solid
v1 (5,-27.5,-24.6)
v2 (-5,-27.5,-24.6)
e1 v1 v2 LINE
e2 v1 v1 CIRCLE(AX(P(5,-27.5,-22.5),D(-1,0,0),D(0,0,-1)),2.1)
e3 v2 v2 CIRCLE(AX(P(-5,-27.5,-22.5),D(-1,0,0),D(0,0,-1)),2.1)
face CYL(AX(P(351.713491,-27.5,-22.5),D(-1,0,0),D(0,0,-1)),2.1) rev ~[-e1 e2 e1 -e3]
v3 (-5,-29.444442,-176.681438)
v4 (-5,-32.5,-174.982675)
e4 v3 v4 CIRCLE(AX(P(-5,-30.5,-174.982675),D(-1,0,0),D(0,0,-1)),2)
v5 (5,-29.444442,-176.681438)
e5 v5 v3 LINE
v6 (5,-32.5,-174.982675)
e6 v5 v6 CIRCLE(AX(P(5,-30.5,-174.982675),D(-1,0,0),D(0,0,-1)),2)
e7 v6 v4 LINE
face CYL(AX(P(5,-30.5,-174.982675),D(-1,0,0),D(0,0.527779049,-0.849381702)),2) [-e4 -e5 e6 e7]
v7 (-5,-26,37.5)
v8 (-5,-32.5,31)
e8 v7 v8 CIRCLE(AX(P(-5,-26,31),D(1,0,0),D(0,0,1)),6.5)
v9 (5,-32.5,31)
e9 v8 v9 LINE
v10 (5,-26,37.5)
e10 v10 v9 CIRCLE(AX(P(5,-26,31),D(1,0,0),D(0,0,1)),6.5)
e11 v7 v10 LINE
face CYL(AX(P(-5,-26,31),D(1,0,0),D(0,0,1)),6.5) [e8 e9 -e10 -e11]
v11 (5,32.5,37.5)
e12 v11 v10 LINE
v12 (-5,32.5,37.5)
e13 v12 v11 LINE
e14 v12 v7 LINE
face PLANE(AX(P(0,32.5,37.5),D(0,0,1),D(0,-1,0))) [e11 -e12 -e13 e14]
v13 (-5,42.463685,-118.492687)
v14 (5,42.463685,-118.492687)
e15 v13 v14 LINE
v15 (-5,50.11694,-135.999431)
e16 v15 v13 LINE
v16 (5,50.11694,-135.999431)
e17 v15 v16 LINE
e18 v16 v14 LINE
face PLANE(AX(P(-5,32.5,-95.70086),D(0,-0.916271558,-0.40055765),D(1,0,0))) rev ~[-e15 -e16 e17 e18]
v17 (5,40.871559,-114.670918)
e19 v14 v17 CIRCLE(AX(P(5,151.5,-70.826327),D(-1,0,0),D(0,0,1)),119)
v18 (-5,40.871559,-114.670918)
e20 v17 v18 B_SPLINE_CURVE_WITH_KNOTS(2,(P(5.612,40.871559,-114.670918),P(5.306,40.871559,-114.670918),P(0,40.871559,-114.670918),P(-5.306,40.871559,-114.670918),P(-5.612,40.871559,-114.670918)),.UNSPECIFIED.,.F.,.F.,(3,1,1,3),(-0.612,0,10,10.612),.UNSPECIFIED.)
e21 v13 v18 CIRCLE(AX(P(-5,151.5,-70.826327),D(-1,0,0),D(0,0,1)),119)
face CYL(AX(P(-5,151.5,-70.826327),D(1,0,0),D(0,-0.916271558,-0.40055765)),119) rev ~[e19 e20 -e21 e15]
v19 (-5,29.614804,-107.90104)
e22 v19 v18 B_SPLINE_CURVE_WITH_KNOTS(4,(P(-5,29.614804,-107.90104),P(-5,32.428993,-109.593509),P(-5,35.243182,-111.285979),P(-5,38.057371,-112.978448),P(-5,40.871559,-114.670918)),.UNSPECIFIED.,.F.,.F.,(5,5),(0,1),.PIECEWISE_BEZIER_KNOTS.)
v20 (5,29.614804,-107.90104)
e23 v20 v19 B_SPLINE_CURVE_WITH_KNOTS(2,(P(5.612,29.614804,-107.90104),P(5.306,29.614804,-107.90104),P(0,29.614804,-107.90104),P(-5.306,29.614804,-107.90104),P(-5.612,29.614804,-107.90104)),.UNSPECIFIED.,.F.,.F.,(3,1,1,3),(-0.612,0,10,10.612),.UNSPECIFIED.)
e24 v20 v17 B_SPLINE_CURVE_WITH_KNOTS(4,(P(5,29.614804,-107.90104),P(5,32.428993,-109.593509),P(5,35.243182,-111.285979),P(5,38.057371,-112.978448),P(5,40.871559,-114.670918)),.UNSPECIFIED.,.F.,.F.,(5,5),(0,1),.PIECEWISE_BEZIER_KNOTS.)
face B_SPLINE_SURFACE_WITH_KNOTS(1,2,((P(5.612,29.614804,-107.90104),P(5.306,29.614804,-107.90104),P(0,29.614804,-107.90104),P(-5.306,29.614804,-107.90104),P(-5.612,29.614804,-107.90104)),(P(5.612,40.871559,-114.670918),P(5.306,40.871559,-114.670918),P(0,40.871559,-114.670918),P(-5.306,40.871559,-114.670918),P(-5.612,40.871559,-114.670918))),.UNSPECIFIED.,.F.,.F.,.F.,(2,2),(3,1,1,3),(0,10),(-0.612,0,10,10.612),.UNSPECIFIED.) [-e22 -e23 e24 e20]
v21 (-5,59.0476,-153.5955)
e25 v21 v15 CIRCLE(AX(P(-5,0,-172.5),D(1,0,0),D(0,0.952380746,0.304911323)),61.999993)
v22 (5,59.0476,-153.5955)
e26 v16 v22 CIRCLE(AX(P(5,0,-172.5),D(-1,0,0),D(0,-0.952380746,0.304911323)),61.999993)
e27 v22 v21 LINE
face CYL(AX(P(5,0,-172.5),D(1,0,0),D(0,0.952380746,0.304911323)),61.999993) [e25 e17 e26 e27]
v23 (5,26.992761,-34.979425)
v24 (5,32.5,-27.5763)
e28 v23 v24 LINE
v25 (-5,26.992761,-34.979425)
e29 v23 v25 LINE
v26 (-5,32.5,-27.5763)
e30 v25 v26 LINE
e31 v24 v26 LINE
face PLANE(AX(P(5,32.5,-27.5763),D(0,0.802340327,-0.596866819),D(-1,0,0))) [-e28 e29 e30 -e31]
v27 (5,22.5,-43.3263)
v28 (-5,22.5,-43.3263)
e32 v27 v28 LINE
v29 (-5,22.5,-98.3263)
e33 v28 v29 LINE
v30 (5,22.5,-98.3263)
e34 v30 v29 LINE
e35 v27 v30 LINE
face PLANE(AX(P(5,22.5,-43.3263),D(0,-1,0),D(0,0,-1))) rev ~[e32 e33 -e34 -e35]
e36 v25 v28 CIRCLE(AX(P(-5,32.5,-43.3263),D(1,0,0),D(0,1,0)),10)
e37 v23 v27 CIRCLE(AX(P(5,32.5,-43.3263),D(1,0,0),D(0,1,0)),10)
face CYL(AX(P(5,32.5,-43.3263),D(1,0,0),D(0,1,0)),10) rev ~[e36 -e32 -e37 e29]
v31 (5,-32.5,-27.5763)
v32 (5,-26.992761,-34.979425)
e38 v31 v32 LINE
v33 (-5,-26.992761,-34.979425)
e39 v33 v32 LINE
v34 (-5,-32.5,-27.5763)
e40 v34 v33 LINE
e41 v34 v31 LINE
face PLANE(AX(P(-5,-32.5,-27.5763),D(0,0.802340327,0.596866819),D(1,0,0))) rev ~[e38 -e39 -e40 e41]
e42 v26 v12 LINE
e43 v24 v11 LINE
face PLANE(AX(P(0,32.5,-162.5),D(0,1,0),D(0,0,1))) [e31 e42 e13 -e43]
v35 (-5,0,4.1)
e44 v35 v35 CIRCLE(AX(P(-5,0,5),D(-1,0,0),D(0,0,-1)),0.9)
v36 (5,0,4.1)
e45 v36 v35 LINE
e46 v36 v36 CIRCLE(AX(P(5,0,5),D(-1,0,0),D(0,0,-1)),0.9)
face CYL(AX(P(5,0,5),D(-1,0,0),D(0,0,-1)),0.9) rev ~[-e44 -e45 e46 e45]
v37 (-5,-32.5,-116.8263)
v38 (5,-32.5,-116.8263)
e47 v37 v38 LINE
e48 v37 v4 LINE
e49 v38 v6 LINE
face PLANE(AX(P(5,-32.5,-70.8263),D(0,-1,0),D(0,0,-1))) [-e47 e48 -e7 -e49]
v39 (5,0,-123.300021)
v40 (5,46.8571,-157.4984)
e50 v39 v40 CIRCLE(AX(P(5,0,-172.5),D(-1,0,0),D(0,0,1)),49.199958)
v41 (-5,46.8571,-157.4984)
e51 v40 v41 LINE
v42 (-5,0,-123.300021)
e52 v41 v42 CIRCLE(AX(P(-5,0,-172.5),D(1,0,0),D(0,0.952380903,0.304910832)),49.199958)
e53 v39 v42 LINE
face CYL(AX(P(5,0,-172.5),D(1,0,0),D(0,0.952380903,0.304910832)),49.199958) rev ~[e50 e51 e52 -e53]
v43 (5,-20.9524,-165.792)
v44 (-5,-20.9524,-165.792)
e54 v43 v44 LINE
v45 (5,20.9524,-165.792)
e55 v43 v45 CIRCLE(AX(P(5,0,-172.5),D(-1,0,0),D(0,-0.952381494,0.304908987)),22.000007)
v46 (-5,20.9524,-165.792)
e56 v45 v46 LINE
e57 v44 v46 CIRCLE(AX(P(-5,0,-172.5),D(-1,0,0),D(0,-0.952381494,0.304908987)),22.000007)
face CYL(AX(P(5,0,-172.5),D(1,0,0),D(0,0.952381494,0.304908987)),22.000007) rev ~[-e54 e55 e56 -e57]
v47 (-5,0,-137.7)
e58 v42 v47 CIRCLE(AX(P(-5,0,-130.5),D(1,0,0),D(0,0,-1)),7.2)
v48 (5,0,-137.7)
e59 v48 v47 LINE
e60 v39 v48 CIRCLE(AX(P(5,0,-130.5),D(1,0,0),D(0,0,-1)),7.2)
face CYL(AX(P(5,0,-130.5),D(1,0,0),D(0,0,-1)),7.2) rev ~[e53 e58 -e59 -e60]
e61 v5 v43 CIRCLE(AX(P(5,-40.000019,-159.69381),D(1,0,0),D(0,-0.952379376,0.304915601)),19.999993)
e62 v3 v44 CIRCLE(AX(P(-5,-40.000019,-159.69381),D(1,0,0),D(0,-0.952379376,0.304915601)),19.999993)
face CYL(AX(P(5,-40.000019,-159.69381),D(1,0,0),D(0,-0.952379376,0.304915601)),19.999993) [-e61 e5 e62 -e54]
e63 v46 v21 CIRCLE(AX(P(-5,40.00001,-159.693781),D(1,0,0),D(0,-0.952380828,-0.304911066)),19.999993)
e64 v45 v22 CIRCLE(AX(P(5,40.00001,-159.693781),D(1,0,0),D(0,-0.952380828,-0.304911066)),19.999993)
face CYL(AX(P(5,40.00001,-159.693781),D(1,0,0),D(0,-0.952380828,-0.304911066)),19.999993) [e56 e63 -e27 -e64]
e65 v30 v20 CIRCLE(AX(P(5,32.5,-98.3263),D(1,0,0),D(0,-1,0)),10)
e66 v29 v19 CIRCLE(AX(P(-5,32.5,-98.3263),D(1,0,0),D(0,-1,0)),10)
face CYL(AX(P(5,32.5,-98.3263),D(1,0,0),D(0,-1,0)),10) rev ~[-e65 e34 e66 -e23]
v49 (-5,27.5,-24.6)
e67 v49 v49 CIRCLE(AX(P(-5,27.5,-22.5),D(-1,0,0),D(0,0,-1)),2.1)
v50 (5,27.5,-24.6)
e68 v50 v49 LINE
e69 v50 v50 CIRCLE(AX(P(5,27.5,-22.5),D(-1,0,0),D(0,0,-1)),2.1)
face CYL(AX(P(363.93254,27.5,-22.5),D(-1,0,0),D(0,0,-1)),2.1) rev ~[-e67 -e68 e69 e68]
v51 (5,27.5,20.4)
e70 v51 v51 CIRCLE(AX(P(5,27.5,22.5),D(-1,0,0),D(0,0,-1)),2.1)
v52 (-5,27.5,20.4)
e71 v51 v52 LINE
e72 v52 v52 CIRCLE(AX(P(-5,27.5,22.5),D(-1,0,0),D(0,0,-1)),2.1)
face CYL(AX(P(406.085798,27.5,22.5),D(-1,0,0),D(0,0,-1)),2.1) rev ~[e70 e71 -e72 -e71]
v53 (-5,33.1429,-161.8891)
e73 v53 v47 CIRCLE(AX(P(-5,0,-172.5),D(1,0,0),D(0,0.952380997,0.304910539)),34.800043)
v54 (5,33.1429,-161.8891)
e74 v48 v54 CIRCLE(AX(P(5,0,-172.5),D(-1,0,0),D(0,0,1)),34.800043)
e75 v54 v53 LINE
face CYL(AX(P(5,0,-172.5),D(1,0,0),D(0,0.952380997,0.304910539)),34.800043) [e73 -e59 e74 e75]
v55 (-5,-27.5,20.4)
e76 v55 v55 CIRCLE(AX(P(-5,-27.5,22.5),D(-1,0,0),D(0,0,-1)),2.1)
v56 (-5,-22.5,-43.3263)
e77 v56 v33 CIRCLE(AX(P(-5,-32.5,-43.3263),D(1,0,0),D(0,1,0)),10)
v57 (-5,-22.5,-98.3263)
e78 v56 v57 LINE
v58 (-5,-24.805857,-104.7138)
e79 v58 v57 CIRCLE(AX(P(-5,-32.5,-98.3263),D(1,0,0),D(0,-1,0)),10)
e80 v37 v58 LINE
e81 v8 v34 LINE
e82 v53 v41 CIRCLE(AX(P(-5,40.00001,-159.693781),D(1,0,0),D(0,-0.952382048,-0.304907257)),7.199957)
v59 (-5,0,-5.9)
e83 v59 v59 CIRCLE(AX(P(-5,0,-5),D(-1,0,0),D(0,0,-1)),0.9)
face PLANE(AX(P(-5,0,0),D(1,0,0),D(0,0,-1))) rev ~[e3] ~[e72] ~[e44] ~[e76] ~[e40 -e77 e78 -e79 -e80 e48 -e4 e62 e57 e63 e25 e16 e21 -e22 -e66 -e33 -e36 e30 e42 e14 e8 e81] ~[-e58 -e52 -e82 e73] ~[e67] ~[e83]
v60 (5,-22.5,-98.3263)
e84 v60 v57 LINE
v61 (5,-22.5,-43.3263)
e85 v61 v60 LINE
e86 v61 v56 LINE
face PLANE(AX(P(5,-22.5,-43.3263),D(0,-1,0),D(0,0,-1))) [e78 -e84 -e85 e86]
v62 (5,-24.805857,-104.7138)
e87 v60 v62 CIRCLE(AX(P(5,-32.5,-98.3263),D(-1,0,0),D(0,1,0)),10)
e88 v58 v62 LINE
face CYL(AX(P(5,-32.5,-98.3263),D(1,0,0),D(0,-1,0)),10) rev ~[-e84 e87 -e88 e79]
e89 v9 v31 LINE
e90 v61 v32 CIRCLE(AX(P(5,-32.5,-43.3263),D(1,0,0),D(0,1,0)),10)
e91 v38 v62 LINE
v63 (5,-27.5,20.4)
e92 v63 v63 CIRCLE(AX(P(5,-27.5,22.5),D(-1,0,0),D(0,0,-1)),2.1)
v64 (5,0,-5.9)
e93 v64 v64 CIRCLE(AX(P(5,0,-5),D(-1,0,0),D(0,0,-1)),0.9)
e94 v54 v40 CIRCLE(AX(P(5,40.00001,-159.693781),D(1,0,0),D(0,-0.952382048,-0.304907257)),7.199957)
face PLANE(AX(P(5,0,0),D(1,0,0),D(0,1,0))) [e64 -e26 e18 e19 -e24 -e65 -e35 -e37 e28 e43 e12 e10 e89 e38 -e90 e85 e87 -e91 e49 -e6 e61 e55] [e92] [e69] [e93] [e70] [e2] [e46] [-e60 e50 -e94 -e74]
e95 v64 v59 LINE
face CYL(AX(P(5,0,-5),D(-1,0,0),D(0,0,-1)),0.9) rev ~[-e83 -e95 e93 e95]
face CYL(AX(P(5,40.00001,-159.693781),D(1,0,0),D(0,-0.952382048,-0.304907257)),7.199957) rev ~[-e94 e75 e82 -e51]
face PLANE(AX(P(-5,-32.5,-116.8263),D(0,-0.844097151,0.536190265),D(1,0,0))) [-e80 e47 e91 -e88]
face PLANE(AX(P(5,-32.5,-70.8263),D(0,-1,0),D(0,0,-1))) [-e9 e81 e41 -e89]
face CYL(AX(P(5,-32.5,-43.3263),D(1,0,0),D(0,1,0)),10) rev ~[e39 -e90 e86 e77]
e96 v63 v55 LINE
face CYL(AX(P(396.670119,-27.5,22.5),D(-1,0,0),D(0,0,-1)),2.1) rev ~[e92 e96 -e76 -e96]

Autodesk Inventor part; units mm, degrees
ref_plane "YZ Plane" through (0, 0, 0) normal (1, 0, 0) x (0, 1, 0)
ref_plane "XZ Plane" through (0, 0, 0) normal (0, 1, 0) x (-1, 0, 0)
ref_plane "XY Plane" through (0, 0, 0) normal (0, 0, 1) x (1, 0, 0)
sketch "Sketch1" plane through (0, 0, 0) normal (1, 0, 0) x (0, 1, 0)
  line L0 (-27.5, 22.5) -> (27.5, 22.5)
  line L1 (27.5, 22.5) -> (27.5, -22.5)
  line L2 (27.5, -22.5) -> (-27.5, -22.5)
  line L3 (-27.5, -22.5) -> (-27.5, 22.5)
  line L4 (-27.5, 22.5) -> (27.5, -22.5) construction
  line L5 (27.5, 22.5) -> (-27.5, -22.5) construction
  line L6 (32.5, 37.5) -> (-32.5, 37.5)
  line L7 (-32.5, 37.5) -> (-32.5, -162.5)
  line L8 (-32.5, -162.5) -> (32.5, -162.5)
  line L9 (32.5, -162.5) -> (32.5, 37.5)
  line L10 (0, 0) -> (0, -107.0279) construction
  dimension "d0" = 45
  dimension "d1" = 55
  dimension "d2" = 65
  dimension "d3" = 200
  dimension "d4" = 15
extrude "Extrusion1" add sketch "Sketch1" along normal mid plane 10 contours L0 L1 L2 L3 | L9 L8 L7 L6
hole "Hole1" at (0, 27.5, 22.5) at (0, -27.5, 22.5) at (0, -27.5, -22.5) at (0, 27.5, -22.5) direction (-1, 0, 0) diameter 4.2 end through all both
sketch "Sketch3" plane through (5, 0, 0) normal (1, 0, 0) x (0, 0, -1)
  circle A0 centre (22.5, -27.5) radius 2.1 projected
  circle A1 centre (-22.5, 27.5) radius 2.1 projected
  circle A2 centre (-22.5, -27.5) radius 2.1 projected
  circle A3 centre (22.5, 27.5) radius 2.1 projected
  line L0 (-37.5, -32.5) -> (162.5, -32.5) projected
  line L1 (162.5, -32.5) -> (162.5, 32.5) projected
  line L2 (162.5, 32.5) -> (-37.5, 32.5) projected
  line L3 (-37.5, 32.5) -> (-37.5, -32.5) projected
  line L4 (162.5, 0) -> (-37.5, 0) construction
  line L5 (-37.5, 32.5) -> (-37.5, -32.5) projected
  line L6 (162.5, -32.5) -> (162.5, 32.5) projected
  arc A4 (159.6938, 40) -> (159.6938, -40) centre (172.5, 0) ccw construction
  arc A5 (153.5955, 59.0476) -> (153.5955, -59.0476) centre (172.5, 0) ccw
  arc A6 (165.792, 20.9524) -> (165.792, -20.9524) centre (172.5, 0) ccw
  arc A7 (165.792, 20.9524) -> (153.5955, 59.0476) centre (159.6938, 40) ccw
  arc A8 (153.5955, -59.0476) -> (165.792, -20.9524) centre (159.6938, -40) ccw
  arc A9 (157.4984, 46.8571) -> (157.4984, -46.8571) centre (172.5, 0) ccw
  arc A10 (157.4984, -46.8571) -> (161.8891, -33.1429) centre (159.6938, -40) ccw
  arc A11 (161.8891, 33.1429) -> (161.8891, -33.1429) centre (172.5, 0) ccw
  arc A12 (161.8891, 33.1429) -> (157.4984, 46.8571) centre (159.6938, 40) ccw
  circle A13 centre (130.5, 0) radius 7.2
  point P0 (0, 0)
  point P1 (162.5, 0)
  point P2 (135.5623, -32.5)
  point P3 (119.7009, -32.5)
  point P4 (113.3868, -25)
  point P5 (160.0585, -32.5)
  point P6 (160.0585, 32.5)
  point P7 (113.3868, 25)
  point P8 (119.7009, 32.5)
  point P9 (135.5623, 32.5)
  point P10 (116.802, 25)
  point P11 (116.802, -25)
  point P12 (123.3, 0)
  point P13 (137.7, 0)
  point P14 (162.5, -19.5959)
  point P15 (162.5, 19.5959)
  dimension "d27" = 42
  dimension "d28" = 20
  dimension "d29" = 10
  dimension "d30" = 80
  dimension "d32" = 7.2
extrude "Extrusion2" add sketch "Sketch3" against normal blind 10 contours A5 L2 A9 L0 | L0 A9 A10 A11 L1 A6 A8 A5 | A9 A13 A11 L0 | L0 A11 A10 A9 | A5 A7 A6 L1 L2 A11 A12 A9 | A11 L2 L1 A6 L0 | A9 L2 A11 A13 | A13 | A9 A12 A11 L2
extrude "Extrusion3" cut sketch "Sketch3" against normal blind 85 contours A9 L2 A11 A13 | A13 | A9 A12 A11 L2
extrude "Extrusion4" cut sketch "Sketch3" against normal blind 85 contours A6 L1
chamfer "Chamfer1" distance 24 angle 45 2 edges at (0, 32.5, -119.7009) (0, -32.5, -119.7009)
fillet "Fillet1" radius 119 2 edges at (0, 32.5, -95.7009) (0, -32.5, -95.7009)
sketch "Sketch4" plane through (5, 0, 0) normal (1, 0, 0) x (0, 0, -1)
  arc A0 (118.4927, -42.4637) -> (70.8263, -32.5) centre (70.8263, -151.5) ccw projected
  line L0 (70.8263, -32.5) -> (178.2342, -32.5)
  arc A1 (153.5955, -59.0476) -> (165.792, -20.9524) centre (159.6938, -40) ccw projected
  arc A2 (135.9994, -50.1169) -> (153.5955, -59.0476) centre (172.5, 0) ccw projected
  line L1 (135.9994, -50.1169) -> (118.4927, -42.4637) projected
  point P0 (0, 0)
extrude "Extrusion5" cut sketch "Sketch4" against normal blind 36.25
fillet "Fillet2" radius 2 1 edges at (0, -32.5, -178.2342)
sketch "Sketch5" plane through (5, 0, 0) normal (1, 0, 0) x (0, 0, -1)
  line L0 (0, 0) -> (0, 9.6714)
  line L1 (-5, 0) -> (5, 0)
  dimension "d46" = 10
hole "Hole3" at (5, 0, -5) at (5, 0, 5) direction (-1, 0, 0) diameter 1.8 end through all
sketch "Sketch6" plane through (5, 0, 0) normal (1, 0, 0) x (0, 0, -1)
  circle A0 centre (5, 0) radius 0.9 projected
  circle A1 centre (-5, 0) radius 0.9 projected
  arc A2 (174.9826, -32.5) -> (176.6814, -29.4444) centre (174.9826, -30.5) ccw projected
  arc A3 (176.6814, -29.4444) -> (165.792, -20.9524) centre (159.6938, -40) ccw projected
  arc A4 (165.792, 20.9524) -> (165.792, -20.9524) centre (172.5, 0) ccw projected
  arc A5 (165.792, 20.9524) -> (153.5955, 59.0476) centre (159.6938, 40) ccw projected
  arc A6 (153.5955, 59.0476) -> (135.9994, 50.1169) centre (172.5, 0) ccw projected
  line L0 (118.4927, 42.4637) -> (135.9994, 50.1169) projected
  arc A7 (70.8263, 32.5) -> (118.4927, 42.4637) centre (70.8263, 151.5) ccw projected
  line L1 (70.8263, 32.5) -> (-37.5, 32.5) projected
  line L2 (-37.5, 32.5) -> (-37.5, -32.5) projected
  line L3 (-37.5, -32.5) -> (174.9826, -32.5) projected
  circle A8 centre (22.5, 27.5) radius 2.1 projected
  circle A9 centre (-22.5, -27.5) radius 2.1 projected
  circle A10 centre (-22.5, 27.5) radius 2.1 projected
  circle A11 centre (22.5, -27.5) radius 2.1 projected
  arc A12 (123.3, 0) -> (137.7, 0) centre (130.5, 0) ccw projected
  arc A13 (157.4984, 46.8571) -> (123.3, 0) centre (172.5, 0) ccw projected
  arc A14 (161.8891, 33.1429) -> (157.4984, 46.8571) centre (159.6938, 40) ccw projected
  arc A15 (161.8891, 33.1429) -> (137.7, 0) centre (172.5, 0) ccw projected
  line L4 (-37.5, 32.5) -> (70.8263, 32.5) projected
  line L5 (70.8263, 32.5) -> (70.8263, -32.5) construction
  line L6 (174.9826, -32.5) -> (-37.5, -32.5) projected
  line L7 (43.3263, 32.5) -> (98.3263, 32.5) construction
  line L8 (70.8263, 32.5) -> (-37.5, 32.5) projected
  line L9 (43.3263, 22.5) -> (98.3263, 22.5)
  line L10 (98.3263, 42.5) -> (43.3263, 42.5)
  arc A16 (43.3263, 42.5) -> (43.3263, 22.5) centre (43.3263, 32.5) ccw
  arc A17 (98.3263, 22.5) -> (98.3263, 42.5) centre (98.3263, 32.5) ccw
  line L11 (70.8263, 0) -> (130.5, 0) construction
  line L12 (43.3263, -22.5) -> (98.3263, -22.5)
  line L13 (98.3263, -42.5) -> (43.3263, -42.5)
  arc A18 (43.3263, -22.5) -> (43.3263, -42.5) centre (43.3263, -32.5) ccw
  arc A19 (98.3263, -42.5) -> (98.3263, -22.5) centre (98.3263, -32.5) ccw
  point P0 (0, 0)
  point P1 (106.6621, 38.024)
  point P2 (33.3263, 32.5)
  dimension "d57" = 10
  dimension "d58" = 55
extrude "Extrusion6" cut sketch "Sketch6" against normal blind 27.5 contours A19 L13 A18 L3 | L3 A18 L12 A19 | L1 A7 A17 L9 A16
chamfer "Chamfer2" distance 8.5 angle 45 2 edges at (0, -32.5, -108.3263) (0, 38.024, -106.6621)
chamfer "Chamfer3" distance 5.75 angle 45 2 edges at (0, -32.5, -33.3263) (0, 32.5, -33.3263)
fillet "Fillet3" radius 6.5 1 edges at (0, -32.5, 37.5)
properties part number "16_Khau_hai" material "Stainless Steel, Austenitic"
